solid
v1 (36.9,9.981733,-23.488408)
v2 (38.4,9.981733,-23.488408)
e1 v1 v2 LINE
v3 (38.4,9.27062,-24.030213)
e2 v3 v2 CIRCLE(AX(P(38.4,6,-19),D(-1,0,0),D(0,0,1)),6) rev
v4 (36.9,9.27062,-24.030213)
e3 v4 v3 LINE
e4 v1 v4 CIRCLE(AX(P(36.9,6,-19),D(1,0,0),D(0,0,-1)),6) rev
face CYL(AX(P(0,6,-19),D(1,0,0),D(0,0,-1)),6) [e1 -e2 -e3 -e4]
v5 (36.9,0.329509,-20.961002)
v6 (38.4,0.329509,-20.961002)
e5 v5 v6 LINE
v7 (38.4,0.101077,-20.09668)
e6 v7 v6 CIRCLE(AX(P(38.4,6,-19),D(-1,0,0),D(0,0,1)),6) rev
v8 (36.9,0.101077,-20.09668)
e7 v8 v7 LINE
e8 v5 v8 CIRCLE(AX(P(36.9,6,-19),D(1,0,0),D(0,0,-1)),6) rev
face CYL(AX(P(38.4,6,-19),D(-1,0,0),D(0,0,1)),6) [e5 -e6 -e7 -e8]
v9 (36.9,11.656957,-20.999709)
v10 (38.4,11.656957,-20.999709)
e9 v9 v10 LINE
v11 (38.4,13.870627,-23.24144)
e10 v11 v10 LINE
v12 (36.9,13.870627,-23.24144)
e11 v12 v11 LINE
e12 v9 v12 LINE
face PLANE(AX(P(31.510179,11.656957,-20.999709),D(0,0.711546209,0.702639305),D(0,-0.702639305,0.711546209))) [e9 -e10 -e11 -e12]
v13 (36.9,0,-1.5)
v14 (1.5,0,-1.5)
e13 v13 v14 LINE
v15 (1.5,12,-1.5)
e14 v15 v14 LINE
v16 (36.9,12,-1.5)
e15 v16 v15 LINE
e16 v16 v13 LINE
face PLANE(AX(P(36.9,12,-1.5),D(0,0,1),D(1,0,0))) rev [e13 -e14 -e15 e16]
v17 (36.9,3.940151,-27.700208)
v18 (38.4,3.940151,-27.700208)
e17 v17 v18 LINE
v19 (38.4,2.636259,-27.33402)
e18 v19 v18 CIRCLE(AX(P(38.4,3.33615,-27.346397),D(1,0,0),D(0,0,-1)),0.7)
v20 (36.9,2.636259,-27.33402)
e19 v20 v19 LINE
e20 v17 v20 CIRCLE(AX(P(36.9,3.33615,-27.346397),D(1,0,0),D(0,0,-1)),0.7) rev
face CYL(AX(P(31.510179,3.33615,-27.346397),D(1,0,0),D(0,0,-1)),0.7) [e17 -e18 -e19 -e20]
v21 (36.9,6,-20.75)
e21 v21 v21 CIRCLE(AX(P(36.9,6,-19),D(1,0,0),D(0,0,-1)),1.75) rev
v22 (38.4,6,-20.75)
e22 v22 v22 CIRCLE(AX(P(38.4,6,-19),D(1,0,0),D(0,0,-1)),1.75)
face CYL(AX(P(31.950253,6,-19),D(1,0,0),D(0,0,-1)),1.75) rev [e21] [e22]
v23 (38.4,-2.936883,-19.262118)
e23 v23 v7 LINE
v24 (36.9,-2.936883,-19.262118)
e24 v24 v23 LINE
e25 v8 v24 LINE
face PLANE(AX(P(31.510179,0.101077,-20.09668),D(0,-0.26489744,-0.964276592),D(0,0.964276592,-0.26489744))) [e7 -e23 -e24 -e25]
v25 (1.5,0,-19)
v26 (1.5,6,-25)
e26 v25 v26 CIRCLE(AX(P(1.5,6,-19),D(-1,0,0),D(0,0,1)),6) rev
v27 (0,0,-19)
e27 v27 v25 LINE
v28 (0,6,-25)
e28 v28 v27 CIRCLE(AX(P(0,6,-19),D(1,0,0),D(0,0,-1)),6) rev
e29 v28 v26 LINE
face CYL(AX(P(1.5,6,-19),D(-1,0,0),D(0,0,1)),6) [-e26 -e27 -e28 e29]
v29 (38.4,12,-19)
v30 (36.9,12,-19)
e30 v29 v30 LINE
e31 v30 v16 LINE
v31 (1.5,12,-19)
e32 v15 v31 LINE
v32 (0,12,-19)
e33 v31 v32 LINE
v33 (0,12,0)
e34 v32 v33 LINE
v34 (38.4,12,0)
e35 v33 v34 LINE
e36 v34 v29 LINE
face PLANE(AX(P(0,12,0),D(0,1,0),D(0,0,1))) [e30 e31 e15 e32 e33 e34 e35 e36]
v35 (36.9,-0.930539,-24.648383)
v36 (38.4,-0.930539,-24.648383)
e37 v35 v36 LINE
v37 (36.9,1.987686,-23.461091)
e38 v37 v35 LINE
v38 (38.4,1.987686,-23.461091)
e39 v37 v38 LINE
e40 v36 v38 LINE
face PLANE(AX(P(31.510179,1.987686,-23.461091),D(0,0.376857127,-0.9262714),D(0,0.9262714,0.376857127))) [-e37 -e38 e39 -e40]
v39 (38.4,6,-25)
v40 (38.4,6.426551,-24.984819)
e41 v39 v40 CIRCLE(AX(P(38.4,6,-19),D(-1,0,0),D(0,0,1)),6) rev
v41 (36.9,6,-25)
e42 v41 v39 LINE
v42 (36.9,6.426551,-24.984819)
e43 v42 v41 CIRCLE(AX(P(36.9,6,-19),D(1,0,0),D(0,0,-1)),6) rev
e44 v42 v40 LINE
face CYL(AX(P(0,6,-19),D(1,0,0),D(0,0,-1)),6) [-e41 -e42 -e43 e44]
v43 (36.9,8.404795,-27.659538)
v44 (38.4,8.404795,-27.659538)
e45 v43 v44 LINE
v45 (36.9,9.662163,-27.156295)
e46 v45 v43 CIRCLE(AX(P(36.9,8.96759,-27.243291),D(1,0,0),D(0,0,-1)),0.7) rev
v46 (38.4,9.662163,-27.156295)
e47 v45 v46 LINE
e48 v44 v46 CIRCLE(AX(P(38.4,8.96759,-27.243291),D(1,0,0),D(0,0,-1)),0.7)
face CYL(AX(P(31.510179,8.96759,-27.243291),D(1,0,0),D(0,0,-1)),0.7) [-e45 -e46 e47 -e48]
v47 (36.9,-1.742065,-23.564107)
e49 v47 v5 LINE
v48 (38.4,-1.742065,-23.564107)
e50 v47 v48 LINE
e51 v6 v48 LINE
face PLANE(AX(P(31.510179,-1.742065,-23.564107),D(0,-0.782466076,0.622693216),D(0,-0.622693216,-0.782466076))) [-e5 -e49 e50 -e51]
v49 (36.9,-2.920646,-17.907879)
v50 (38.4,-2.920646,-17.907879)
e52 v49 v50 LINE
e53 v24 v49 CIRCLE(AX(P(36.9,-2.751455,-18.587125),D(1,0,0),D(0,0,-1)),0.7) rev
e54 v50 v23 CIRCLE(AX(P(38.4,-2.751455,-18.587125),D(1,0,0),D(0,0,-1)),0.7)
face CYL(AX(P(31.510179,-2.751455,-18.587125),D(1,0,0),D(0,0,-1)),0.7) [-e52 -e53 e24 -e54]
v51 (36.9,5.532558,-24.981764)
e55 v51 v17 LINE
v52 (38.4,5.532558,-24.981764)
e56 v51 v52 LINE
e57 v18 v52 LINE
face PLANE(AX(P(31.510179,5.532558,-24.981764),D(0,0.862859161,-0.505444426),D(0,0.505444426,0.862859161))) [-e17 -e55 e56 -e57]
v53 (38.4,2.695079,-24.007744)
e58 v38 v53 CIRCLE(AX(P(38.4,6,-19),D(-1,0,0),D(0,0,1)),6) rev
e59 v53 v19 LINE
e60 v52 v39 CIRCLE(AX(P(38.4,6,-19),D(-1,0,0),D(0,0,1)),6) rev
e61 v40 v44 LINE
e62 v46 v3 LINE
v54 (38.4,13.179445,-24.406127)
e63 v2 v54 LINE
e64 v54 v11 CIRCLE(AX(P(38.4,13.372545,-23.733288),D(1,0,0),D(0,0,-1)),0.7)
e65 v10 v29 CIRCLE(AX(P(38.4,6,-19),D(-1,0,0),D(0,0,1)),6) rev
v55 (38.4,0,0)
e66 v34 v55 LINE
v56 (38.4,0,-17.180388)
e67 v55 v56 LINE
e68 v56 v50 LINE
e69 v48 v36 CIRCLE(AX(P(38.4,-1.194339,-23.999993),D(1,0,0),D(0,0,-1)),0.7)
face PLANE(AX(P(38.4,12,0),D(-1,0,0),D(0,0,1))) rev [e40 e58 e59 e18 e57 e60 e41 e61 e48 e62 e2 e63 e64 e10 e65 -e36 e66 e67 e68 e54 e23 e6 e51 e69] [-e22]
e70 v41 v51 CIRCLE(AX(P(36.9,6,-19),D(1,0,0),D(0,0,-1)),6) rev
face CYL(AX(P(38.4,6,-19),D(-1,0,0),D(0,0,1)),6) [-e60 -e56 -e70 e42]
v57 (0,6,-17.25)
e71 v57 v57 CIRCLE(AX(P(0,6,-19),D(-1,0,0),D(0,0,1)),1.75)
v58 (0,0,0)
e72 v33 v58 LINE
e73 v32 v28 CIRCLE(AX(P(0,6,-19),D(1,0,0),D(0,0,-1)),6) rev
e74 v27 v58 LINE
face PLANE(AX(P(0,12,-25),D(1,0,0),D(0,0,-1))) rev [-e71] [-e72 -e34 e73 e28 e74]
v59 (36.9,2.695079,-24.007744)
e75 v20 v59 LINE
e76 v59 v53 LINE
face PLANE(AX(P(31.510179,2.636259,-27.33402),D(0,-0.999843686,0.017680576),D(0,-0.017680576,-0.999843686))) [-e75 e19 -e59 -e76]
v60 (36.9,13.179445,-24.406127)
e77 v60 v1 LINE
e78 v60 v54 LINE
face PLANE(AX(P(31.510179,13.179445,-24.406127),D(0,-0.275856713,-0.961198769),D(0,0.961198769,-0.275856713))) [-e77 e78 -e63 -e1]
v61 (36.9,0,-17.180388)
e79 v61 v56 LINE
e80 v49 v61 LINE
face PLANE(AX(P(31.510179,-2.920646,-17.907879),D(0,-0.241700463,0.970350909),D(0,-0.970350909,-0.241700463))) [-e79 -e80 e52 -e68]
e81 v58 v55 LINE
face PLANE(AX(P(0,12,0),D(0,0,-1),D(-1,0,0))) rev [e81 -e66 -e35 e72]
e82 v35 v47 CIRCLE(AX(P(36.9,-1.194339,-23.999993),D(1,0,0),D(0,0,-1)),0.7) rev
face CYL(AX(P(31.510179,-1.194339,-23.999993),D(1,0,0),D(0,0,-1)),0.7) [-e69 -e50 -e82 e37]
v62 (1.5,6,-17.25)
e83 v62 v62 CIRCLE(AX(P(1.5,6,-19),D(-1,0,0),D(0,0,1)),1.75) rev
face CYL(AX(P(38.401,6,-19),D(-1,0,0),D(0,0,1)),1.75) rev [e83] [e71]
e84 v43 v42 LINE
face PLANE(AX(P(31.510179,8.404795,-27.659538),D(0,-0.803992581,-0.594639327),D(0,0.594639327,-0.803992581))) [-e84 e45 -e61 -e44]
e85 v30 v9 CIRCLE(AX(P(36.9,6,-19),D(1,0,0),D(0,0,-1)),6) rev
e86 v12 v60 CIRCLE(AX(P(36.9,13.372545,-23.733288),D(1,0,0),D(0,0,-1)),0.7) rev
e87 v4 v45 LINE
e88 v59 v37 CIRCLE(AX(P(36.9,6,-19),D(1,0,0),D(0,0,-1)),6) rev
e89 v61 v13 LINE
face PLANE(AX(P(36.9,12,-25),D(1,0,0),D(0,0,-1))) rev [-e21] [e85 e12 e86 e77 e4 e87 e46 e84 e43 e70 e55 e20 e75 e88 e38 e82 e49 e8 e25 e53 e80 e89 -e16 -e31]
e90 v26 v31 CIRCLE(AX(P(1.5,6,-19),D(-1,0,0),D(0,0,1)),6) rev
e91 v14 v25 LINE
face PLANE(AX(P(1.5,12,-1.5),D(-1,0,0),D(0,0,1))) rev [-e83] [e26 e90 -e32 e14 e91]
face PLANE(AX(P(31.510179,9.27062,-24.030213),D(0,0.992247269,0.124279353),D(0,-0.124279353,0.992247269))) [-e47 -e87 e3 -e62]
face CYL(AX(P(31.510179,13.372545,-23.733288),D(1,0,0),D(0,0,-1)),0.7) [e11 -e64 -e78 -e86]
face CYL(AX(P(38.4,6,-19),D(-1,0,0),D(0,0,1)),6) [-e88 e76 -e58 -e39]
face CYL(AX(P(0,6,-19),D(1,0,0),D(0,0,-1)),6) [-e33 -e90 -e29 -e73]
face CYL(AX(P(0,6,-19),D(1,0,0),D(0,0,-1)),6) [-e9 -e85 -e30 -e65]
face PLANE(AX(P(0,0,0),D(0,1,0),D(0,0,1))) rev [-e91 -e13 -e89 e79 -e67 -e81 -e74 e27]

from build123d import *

# Parameters (mm, degrees)
EXTRUDE_2_DEPTH     = 12
FILLET_1_R          = 6
CUT_EXTRUDE_3_REACH = 49.366
SKETCH_5_R          = 1.75
CUT_EXTRUDE_START   = -1.5
SKETCH_6_R          = 1.75
CUT_EXTRUDE_4_DEPTH = 1.5
EXTRUDE_3_DEPTH     = 1.5


with BuildPart() as part:
    # 草图2 → 凸台-拉伸2 (new body)
    with BuildSketch(Plane(origin=(0, 0, 0), x_dir=(1, 0, 0), z_dir=(0, 1, 0))):
        Polygon((0, 0), (38.4, 0), (38.4, 25), (36.9, 25), (36.9, 1.5), (1.5, 1.5), (1.5, 25), (0, 25), align=None)
    extrude(amount=EXTRUDE_2_DEPTH)

    # 圆角1
    fillet_1_edges = [part.edges().sort_by_distance(p)[0] for p in [
        (0.75, 0, -25),
        (0.75, 12, -25),
        (37.65, 0, -25),
        (37.65, 12, -25),
    ]]
    fillet(fillet_1_edges, radius=FILLET_1_R - 0.0001)  # a hair under: the kernel refuses the full size

    # 草图5 → 切除-拉伸3 (cut, up to next)
    with BuildSketch(Plane.ZY, mode=Mode.PRIVATE) as cut_extrude_3_sk1:
        with Locations((-19, 6)):
            Circle(SKETCH_5_R)
    cut_extrude_3_tool1 = extrude(cut_extrude_3_sk1.sketch, amount=-CUT_EXTRUDE_3_REACH, mode=Mode.PRIVATE) & part.part
    add(cut_extrude_3_tool1.solids().sort_by_distance((0, 6, -19))[0], mode=Mode.SUBTRACT)

    # 草图6 → 切除-拉伸4 (cut)
    with BuildSketch(Plane(origin=(38.4, 0, 0), x_dir=(0, 0, -1), z_dir=(1, 0, 0)).offset(CUT_EXTRUDE_START)):
        with Locations(Location((19, 6, 0), (0, 0, 180))):
            Circle(SKETCH_6_R)
    extrude(amount=CUT_EXTRUDE_4_DEPTH, mode=Mode.SUBTRACT)

    # 草图7 → 凸台-拉伸3 (add)
    with BuildSketch(Plane(origin=(38.4, 0, 0), x_dir=(0, 0, -1), z_dir=(1, 0, 0))):
        with BuildLine():
            Line((20.999709003, 11.656957124), (23.241440486, 13.870627343))
            ThreePointArc((23.241440486, 13.870627343), (24.09053112, 13.974522864), (24.406127138, 13.179445297))
            Line((24.406127138, 13.179445297), (23.488407969, 9.981732526))
            ThreePointArc((23.488407969, 9.981732526), (22.350449197, 10.977397932), (20.999709003, 11.656957124))
        make_face()
        with BuildLine():
            Line((27.659538401, 8.404795226), (24.984818637, 6.42655115))
            ThreePointArc((24.984818637, 6.42655115), (24.68813794, 7.909211035), (24.03021312, 9.27062012))
            Line((24.03021312, 9.27062012), (27.156295325, 9.662163121))
            ThreePointArc((27.156295325, 9.662163121), (27.893171802, 9.227695353), (27.659538401, 8.404795226))
        make_face()
        with BuildLine():
            Line((27.334020294, 2.636259354), (24.007743744, 2.695079034))
            ThreePointArc((24.007743744, 2.695079034), (24.674957273, 4.051959971), (24.981763759, 5.53255767))
            Line((24.981763759, 5.53255767), (27.700207796, 3.940151347))
            ThreePointArc((27.700207796, 3.940151347), (28.02032399, 3.146882915), (27.334020294, 2.636259354))
        make_face()
        with BuildLine():
            Line((23.564107276, -1.742064981), (20.961001817, 0.329508674))
            ThreePointArc((20.961001817, 0.329508674), (22.316354676, 0.999820837), (23.461091399, 1.987686013))
            Line((23.461091399, 1.987686013), (24.648382507, -0.93053874))
            ThreePointArc((24.648382507, -0.93053874), (24.419436534, -1.754755292), (23.564107276, -1.742064981))
        make_face()
        with BuildLine():
            Line((17.907879211, -2.920645581), (17.103790939, 0.307514497))
            ThreePointArc((17.103790939, 0.307514497), (18.587124847, 0.014222347), (20.096679766, 0.101076921))
            Line((20.096679766, 0.101076921), (19.262118462, -2.936883465))
            ThreePointArc((19.262118462, -2.936883465), (18.578732164, -3.451404943), (17.907879211, -2.920645581))
        make_face()
    extrude(amount=-EXTRUDE_3_DEPTH)


solid = part.part
